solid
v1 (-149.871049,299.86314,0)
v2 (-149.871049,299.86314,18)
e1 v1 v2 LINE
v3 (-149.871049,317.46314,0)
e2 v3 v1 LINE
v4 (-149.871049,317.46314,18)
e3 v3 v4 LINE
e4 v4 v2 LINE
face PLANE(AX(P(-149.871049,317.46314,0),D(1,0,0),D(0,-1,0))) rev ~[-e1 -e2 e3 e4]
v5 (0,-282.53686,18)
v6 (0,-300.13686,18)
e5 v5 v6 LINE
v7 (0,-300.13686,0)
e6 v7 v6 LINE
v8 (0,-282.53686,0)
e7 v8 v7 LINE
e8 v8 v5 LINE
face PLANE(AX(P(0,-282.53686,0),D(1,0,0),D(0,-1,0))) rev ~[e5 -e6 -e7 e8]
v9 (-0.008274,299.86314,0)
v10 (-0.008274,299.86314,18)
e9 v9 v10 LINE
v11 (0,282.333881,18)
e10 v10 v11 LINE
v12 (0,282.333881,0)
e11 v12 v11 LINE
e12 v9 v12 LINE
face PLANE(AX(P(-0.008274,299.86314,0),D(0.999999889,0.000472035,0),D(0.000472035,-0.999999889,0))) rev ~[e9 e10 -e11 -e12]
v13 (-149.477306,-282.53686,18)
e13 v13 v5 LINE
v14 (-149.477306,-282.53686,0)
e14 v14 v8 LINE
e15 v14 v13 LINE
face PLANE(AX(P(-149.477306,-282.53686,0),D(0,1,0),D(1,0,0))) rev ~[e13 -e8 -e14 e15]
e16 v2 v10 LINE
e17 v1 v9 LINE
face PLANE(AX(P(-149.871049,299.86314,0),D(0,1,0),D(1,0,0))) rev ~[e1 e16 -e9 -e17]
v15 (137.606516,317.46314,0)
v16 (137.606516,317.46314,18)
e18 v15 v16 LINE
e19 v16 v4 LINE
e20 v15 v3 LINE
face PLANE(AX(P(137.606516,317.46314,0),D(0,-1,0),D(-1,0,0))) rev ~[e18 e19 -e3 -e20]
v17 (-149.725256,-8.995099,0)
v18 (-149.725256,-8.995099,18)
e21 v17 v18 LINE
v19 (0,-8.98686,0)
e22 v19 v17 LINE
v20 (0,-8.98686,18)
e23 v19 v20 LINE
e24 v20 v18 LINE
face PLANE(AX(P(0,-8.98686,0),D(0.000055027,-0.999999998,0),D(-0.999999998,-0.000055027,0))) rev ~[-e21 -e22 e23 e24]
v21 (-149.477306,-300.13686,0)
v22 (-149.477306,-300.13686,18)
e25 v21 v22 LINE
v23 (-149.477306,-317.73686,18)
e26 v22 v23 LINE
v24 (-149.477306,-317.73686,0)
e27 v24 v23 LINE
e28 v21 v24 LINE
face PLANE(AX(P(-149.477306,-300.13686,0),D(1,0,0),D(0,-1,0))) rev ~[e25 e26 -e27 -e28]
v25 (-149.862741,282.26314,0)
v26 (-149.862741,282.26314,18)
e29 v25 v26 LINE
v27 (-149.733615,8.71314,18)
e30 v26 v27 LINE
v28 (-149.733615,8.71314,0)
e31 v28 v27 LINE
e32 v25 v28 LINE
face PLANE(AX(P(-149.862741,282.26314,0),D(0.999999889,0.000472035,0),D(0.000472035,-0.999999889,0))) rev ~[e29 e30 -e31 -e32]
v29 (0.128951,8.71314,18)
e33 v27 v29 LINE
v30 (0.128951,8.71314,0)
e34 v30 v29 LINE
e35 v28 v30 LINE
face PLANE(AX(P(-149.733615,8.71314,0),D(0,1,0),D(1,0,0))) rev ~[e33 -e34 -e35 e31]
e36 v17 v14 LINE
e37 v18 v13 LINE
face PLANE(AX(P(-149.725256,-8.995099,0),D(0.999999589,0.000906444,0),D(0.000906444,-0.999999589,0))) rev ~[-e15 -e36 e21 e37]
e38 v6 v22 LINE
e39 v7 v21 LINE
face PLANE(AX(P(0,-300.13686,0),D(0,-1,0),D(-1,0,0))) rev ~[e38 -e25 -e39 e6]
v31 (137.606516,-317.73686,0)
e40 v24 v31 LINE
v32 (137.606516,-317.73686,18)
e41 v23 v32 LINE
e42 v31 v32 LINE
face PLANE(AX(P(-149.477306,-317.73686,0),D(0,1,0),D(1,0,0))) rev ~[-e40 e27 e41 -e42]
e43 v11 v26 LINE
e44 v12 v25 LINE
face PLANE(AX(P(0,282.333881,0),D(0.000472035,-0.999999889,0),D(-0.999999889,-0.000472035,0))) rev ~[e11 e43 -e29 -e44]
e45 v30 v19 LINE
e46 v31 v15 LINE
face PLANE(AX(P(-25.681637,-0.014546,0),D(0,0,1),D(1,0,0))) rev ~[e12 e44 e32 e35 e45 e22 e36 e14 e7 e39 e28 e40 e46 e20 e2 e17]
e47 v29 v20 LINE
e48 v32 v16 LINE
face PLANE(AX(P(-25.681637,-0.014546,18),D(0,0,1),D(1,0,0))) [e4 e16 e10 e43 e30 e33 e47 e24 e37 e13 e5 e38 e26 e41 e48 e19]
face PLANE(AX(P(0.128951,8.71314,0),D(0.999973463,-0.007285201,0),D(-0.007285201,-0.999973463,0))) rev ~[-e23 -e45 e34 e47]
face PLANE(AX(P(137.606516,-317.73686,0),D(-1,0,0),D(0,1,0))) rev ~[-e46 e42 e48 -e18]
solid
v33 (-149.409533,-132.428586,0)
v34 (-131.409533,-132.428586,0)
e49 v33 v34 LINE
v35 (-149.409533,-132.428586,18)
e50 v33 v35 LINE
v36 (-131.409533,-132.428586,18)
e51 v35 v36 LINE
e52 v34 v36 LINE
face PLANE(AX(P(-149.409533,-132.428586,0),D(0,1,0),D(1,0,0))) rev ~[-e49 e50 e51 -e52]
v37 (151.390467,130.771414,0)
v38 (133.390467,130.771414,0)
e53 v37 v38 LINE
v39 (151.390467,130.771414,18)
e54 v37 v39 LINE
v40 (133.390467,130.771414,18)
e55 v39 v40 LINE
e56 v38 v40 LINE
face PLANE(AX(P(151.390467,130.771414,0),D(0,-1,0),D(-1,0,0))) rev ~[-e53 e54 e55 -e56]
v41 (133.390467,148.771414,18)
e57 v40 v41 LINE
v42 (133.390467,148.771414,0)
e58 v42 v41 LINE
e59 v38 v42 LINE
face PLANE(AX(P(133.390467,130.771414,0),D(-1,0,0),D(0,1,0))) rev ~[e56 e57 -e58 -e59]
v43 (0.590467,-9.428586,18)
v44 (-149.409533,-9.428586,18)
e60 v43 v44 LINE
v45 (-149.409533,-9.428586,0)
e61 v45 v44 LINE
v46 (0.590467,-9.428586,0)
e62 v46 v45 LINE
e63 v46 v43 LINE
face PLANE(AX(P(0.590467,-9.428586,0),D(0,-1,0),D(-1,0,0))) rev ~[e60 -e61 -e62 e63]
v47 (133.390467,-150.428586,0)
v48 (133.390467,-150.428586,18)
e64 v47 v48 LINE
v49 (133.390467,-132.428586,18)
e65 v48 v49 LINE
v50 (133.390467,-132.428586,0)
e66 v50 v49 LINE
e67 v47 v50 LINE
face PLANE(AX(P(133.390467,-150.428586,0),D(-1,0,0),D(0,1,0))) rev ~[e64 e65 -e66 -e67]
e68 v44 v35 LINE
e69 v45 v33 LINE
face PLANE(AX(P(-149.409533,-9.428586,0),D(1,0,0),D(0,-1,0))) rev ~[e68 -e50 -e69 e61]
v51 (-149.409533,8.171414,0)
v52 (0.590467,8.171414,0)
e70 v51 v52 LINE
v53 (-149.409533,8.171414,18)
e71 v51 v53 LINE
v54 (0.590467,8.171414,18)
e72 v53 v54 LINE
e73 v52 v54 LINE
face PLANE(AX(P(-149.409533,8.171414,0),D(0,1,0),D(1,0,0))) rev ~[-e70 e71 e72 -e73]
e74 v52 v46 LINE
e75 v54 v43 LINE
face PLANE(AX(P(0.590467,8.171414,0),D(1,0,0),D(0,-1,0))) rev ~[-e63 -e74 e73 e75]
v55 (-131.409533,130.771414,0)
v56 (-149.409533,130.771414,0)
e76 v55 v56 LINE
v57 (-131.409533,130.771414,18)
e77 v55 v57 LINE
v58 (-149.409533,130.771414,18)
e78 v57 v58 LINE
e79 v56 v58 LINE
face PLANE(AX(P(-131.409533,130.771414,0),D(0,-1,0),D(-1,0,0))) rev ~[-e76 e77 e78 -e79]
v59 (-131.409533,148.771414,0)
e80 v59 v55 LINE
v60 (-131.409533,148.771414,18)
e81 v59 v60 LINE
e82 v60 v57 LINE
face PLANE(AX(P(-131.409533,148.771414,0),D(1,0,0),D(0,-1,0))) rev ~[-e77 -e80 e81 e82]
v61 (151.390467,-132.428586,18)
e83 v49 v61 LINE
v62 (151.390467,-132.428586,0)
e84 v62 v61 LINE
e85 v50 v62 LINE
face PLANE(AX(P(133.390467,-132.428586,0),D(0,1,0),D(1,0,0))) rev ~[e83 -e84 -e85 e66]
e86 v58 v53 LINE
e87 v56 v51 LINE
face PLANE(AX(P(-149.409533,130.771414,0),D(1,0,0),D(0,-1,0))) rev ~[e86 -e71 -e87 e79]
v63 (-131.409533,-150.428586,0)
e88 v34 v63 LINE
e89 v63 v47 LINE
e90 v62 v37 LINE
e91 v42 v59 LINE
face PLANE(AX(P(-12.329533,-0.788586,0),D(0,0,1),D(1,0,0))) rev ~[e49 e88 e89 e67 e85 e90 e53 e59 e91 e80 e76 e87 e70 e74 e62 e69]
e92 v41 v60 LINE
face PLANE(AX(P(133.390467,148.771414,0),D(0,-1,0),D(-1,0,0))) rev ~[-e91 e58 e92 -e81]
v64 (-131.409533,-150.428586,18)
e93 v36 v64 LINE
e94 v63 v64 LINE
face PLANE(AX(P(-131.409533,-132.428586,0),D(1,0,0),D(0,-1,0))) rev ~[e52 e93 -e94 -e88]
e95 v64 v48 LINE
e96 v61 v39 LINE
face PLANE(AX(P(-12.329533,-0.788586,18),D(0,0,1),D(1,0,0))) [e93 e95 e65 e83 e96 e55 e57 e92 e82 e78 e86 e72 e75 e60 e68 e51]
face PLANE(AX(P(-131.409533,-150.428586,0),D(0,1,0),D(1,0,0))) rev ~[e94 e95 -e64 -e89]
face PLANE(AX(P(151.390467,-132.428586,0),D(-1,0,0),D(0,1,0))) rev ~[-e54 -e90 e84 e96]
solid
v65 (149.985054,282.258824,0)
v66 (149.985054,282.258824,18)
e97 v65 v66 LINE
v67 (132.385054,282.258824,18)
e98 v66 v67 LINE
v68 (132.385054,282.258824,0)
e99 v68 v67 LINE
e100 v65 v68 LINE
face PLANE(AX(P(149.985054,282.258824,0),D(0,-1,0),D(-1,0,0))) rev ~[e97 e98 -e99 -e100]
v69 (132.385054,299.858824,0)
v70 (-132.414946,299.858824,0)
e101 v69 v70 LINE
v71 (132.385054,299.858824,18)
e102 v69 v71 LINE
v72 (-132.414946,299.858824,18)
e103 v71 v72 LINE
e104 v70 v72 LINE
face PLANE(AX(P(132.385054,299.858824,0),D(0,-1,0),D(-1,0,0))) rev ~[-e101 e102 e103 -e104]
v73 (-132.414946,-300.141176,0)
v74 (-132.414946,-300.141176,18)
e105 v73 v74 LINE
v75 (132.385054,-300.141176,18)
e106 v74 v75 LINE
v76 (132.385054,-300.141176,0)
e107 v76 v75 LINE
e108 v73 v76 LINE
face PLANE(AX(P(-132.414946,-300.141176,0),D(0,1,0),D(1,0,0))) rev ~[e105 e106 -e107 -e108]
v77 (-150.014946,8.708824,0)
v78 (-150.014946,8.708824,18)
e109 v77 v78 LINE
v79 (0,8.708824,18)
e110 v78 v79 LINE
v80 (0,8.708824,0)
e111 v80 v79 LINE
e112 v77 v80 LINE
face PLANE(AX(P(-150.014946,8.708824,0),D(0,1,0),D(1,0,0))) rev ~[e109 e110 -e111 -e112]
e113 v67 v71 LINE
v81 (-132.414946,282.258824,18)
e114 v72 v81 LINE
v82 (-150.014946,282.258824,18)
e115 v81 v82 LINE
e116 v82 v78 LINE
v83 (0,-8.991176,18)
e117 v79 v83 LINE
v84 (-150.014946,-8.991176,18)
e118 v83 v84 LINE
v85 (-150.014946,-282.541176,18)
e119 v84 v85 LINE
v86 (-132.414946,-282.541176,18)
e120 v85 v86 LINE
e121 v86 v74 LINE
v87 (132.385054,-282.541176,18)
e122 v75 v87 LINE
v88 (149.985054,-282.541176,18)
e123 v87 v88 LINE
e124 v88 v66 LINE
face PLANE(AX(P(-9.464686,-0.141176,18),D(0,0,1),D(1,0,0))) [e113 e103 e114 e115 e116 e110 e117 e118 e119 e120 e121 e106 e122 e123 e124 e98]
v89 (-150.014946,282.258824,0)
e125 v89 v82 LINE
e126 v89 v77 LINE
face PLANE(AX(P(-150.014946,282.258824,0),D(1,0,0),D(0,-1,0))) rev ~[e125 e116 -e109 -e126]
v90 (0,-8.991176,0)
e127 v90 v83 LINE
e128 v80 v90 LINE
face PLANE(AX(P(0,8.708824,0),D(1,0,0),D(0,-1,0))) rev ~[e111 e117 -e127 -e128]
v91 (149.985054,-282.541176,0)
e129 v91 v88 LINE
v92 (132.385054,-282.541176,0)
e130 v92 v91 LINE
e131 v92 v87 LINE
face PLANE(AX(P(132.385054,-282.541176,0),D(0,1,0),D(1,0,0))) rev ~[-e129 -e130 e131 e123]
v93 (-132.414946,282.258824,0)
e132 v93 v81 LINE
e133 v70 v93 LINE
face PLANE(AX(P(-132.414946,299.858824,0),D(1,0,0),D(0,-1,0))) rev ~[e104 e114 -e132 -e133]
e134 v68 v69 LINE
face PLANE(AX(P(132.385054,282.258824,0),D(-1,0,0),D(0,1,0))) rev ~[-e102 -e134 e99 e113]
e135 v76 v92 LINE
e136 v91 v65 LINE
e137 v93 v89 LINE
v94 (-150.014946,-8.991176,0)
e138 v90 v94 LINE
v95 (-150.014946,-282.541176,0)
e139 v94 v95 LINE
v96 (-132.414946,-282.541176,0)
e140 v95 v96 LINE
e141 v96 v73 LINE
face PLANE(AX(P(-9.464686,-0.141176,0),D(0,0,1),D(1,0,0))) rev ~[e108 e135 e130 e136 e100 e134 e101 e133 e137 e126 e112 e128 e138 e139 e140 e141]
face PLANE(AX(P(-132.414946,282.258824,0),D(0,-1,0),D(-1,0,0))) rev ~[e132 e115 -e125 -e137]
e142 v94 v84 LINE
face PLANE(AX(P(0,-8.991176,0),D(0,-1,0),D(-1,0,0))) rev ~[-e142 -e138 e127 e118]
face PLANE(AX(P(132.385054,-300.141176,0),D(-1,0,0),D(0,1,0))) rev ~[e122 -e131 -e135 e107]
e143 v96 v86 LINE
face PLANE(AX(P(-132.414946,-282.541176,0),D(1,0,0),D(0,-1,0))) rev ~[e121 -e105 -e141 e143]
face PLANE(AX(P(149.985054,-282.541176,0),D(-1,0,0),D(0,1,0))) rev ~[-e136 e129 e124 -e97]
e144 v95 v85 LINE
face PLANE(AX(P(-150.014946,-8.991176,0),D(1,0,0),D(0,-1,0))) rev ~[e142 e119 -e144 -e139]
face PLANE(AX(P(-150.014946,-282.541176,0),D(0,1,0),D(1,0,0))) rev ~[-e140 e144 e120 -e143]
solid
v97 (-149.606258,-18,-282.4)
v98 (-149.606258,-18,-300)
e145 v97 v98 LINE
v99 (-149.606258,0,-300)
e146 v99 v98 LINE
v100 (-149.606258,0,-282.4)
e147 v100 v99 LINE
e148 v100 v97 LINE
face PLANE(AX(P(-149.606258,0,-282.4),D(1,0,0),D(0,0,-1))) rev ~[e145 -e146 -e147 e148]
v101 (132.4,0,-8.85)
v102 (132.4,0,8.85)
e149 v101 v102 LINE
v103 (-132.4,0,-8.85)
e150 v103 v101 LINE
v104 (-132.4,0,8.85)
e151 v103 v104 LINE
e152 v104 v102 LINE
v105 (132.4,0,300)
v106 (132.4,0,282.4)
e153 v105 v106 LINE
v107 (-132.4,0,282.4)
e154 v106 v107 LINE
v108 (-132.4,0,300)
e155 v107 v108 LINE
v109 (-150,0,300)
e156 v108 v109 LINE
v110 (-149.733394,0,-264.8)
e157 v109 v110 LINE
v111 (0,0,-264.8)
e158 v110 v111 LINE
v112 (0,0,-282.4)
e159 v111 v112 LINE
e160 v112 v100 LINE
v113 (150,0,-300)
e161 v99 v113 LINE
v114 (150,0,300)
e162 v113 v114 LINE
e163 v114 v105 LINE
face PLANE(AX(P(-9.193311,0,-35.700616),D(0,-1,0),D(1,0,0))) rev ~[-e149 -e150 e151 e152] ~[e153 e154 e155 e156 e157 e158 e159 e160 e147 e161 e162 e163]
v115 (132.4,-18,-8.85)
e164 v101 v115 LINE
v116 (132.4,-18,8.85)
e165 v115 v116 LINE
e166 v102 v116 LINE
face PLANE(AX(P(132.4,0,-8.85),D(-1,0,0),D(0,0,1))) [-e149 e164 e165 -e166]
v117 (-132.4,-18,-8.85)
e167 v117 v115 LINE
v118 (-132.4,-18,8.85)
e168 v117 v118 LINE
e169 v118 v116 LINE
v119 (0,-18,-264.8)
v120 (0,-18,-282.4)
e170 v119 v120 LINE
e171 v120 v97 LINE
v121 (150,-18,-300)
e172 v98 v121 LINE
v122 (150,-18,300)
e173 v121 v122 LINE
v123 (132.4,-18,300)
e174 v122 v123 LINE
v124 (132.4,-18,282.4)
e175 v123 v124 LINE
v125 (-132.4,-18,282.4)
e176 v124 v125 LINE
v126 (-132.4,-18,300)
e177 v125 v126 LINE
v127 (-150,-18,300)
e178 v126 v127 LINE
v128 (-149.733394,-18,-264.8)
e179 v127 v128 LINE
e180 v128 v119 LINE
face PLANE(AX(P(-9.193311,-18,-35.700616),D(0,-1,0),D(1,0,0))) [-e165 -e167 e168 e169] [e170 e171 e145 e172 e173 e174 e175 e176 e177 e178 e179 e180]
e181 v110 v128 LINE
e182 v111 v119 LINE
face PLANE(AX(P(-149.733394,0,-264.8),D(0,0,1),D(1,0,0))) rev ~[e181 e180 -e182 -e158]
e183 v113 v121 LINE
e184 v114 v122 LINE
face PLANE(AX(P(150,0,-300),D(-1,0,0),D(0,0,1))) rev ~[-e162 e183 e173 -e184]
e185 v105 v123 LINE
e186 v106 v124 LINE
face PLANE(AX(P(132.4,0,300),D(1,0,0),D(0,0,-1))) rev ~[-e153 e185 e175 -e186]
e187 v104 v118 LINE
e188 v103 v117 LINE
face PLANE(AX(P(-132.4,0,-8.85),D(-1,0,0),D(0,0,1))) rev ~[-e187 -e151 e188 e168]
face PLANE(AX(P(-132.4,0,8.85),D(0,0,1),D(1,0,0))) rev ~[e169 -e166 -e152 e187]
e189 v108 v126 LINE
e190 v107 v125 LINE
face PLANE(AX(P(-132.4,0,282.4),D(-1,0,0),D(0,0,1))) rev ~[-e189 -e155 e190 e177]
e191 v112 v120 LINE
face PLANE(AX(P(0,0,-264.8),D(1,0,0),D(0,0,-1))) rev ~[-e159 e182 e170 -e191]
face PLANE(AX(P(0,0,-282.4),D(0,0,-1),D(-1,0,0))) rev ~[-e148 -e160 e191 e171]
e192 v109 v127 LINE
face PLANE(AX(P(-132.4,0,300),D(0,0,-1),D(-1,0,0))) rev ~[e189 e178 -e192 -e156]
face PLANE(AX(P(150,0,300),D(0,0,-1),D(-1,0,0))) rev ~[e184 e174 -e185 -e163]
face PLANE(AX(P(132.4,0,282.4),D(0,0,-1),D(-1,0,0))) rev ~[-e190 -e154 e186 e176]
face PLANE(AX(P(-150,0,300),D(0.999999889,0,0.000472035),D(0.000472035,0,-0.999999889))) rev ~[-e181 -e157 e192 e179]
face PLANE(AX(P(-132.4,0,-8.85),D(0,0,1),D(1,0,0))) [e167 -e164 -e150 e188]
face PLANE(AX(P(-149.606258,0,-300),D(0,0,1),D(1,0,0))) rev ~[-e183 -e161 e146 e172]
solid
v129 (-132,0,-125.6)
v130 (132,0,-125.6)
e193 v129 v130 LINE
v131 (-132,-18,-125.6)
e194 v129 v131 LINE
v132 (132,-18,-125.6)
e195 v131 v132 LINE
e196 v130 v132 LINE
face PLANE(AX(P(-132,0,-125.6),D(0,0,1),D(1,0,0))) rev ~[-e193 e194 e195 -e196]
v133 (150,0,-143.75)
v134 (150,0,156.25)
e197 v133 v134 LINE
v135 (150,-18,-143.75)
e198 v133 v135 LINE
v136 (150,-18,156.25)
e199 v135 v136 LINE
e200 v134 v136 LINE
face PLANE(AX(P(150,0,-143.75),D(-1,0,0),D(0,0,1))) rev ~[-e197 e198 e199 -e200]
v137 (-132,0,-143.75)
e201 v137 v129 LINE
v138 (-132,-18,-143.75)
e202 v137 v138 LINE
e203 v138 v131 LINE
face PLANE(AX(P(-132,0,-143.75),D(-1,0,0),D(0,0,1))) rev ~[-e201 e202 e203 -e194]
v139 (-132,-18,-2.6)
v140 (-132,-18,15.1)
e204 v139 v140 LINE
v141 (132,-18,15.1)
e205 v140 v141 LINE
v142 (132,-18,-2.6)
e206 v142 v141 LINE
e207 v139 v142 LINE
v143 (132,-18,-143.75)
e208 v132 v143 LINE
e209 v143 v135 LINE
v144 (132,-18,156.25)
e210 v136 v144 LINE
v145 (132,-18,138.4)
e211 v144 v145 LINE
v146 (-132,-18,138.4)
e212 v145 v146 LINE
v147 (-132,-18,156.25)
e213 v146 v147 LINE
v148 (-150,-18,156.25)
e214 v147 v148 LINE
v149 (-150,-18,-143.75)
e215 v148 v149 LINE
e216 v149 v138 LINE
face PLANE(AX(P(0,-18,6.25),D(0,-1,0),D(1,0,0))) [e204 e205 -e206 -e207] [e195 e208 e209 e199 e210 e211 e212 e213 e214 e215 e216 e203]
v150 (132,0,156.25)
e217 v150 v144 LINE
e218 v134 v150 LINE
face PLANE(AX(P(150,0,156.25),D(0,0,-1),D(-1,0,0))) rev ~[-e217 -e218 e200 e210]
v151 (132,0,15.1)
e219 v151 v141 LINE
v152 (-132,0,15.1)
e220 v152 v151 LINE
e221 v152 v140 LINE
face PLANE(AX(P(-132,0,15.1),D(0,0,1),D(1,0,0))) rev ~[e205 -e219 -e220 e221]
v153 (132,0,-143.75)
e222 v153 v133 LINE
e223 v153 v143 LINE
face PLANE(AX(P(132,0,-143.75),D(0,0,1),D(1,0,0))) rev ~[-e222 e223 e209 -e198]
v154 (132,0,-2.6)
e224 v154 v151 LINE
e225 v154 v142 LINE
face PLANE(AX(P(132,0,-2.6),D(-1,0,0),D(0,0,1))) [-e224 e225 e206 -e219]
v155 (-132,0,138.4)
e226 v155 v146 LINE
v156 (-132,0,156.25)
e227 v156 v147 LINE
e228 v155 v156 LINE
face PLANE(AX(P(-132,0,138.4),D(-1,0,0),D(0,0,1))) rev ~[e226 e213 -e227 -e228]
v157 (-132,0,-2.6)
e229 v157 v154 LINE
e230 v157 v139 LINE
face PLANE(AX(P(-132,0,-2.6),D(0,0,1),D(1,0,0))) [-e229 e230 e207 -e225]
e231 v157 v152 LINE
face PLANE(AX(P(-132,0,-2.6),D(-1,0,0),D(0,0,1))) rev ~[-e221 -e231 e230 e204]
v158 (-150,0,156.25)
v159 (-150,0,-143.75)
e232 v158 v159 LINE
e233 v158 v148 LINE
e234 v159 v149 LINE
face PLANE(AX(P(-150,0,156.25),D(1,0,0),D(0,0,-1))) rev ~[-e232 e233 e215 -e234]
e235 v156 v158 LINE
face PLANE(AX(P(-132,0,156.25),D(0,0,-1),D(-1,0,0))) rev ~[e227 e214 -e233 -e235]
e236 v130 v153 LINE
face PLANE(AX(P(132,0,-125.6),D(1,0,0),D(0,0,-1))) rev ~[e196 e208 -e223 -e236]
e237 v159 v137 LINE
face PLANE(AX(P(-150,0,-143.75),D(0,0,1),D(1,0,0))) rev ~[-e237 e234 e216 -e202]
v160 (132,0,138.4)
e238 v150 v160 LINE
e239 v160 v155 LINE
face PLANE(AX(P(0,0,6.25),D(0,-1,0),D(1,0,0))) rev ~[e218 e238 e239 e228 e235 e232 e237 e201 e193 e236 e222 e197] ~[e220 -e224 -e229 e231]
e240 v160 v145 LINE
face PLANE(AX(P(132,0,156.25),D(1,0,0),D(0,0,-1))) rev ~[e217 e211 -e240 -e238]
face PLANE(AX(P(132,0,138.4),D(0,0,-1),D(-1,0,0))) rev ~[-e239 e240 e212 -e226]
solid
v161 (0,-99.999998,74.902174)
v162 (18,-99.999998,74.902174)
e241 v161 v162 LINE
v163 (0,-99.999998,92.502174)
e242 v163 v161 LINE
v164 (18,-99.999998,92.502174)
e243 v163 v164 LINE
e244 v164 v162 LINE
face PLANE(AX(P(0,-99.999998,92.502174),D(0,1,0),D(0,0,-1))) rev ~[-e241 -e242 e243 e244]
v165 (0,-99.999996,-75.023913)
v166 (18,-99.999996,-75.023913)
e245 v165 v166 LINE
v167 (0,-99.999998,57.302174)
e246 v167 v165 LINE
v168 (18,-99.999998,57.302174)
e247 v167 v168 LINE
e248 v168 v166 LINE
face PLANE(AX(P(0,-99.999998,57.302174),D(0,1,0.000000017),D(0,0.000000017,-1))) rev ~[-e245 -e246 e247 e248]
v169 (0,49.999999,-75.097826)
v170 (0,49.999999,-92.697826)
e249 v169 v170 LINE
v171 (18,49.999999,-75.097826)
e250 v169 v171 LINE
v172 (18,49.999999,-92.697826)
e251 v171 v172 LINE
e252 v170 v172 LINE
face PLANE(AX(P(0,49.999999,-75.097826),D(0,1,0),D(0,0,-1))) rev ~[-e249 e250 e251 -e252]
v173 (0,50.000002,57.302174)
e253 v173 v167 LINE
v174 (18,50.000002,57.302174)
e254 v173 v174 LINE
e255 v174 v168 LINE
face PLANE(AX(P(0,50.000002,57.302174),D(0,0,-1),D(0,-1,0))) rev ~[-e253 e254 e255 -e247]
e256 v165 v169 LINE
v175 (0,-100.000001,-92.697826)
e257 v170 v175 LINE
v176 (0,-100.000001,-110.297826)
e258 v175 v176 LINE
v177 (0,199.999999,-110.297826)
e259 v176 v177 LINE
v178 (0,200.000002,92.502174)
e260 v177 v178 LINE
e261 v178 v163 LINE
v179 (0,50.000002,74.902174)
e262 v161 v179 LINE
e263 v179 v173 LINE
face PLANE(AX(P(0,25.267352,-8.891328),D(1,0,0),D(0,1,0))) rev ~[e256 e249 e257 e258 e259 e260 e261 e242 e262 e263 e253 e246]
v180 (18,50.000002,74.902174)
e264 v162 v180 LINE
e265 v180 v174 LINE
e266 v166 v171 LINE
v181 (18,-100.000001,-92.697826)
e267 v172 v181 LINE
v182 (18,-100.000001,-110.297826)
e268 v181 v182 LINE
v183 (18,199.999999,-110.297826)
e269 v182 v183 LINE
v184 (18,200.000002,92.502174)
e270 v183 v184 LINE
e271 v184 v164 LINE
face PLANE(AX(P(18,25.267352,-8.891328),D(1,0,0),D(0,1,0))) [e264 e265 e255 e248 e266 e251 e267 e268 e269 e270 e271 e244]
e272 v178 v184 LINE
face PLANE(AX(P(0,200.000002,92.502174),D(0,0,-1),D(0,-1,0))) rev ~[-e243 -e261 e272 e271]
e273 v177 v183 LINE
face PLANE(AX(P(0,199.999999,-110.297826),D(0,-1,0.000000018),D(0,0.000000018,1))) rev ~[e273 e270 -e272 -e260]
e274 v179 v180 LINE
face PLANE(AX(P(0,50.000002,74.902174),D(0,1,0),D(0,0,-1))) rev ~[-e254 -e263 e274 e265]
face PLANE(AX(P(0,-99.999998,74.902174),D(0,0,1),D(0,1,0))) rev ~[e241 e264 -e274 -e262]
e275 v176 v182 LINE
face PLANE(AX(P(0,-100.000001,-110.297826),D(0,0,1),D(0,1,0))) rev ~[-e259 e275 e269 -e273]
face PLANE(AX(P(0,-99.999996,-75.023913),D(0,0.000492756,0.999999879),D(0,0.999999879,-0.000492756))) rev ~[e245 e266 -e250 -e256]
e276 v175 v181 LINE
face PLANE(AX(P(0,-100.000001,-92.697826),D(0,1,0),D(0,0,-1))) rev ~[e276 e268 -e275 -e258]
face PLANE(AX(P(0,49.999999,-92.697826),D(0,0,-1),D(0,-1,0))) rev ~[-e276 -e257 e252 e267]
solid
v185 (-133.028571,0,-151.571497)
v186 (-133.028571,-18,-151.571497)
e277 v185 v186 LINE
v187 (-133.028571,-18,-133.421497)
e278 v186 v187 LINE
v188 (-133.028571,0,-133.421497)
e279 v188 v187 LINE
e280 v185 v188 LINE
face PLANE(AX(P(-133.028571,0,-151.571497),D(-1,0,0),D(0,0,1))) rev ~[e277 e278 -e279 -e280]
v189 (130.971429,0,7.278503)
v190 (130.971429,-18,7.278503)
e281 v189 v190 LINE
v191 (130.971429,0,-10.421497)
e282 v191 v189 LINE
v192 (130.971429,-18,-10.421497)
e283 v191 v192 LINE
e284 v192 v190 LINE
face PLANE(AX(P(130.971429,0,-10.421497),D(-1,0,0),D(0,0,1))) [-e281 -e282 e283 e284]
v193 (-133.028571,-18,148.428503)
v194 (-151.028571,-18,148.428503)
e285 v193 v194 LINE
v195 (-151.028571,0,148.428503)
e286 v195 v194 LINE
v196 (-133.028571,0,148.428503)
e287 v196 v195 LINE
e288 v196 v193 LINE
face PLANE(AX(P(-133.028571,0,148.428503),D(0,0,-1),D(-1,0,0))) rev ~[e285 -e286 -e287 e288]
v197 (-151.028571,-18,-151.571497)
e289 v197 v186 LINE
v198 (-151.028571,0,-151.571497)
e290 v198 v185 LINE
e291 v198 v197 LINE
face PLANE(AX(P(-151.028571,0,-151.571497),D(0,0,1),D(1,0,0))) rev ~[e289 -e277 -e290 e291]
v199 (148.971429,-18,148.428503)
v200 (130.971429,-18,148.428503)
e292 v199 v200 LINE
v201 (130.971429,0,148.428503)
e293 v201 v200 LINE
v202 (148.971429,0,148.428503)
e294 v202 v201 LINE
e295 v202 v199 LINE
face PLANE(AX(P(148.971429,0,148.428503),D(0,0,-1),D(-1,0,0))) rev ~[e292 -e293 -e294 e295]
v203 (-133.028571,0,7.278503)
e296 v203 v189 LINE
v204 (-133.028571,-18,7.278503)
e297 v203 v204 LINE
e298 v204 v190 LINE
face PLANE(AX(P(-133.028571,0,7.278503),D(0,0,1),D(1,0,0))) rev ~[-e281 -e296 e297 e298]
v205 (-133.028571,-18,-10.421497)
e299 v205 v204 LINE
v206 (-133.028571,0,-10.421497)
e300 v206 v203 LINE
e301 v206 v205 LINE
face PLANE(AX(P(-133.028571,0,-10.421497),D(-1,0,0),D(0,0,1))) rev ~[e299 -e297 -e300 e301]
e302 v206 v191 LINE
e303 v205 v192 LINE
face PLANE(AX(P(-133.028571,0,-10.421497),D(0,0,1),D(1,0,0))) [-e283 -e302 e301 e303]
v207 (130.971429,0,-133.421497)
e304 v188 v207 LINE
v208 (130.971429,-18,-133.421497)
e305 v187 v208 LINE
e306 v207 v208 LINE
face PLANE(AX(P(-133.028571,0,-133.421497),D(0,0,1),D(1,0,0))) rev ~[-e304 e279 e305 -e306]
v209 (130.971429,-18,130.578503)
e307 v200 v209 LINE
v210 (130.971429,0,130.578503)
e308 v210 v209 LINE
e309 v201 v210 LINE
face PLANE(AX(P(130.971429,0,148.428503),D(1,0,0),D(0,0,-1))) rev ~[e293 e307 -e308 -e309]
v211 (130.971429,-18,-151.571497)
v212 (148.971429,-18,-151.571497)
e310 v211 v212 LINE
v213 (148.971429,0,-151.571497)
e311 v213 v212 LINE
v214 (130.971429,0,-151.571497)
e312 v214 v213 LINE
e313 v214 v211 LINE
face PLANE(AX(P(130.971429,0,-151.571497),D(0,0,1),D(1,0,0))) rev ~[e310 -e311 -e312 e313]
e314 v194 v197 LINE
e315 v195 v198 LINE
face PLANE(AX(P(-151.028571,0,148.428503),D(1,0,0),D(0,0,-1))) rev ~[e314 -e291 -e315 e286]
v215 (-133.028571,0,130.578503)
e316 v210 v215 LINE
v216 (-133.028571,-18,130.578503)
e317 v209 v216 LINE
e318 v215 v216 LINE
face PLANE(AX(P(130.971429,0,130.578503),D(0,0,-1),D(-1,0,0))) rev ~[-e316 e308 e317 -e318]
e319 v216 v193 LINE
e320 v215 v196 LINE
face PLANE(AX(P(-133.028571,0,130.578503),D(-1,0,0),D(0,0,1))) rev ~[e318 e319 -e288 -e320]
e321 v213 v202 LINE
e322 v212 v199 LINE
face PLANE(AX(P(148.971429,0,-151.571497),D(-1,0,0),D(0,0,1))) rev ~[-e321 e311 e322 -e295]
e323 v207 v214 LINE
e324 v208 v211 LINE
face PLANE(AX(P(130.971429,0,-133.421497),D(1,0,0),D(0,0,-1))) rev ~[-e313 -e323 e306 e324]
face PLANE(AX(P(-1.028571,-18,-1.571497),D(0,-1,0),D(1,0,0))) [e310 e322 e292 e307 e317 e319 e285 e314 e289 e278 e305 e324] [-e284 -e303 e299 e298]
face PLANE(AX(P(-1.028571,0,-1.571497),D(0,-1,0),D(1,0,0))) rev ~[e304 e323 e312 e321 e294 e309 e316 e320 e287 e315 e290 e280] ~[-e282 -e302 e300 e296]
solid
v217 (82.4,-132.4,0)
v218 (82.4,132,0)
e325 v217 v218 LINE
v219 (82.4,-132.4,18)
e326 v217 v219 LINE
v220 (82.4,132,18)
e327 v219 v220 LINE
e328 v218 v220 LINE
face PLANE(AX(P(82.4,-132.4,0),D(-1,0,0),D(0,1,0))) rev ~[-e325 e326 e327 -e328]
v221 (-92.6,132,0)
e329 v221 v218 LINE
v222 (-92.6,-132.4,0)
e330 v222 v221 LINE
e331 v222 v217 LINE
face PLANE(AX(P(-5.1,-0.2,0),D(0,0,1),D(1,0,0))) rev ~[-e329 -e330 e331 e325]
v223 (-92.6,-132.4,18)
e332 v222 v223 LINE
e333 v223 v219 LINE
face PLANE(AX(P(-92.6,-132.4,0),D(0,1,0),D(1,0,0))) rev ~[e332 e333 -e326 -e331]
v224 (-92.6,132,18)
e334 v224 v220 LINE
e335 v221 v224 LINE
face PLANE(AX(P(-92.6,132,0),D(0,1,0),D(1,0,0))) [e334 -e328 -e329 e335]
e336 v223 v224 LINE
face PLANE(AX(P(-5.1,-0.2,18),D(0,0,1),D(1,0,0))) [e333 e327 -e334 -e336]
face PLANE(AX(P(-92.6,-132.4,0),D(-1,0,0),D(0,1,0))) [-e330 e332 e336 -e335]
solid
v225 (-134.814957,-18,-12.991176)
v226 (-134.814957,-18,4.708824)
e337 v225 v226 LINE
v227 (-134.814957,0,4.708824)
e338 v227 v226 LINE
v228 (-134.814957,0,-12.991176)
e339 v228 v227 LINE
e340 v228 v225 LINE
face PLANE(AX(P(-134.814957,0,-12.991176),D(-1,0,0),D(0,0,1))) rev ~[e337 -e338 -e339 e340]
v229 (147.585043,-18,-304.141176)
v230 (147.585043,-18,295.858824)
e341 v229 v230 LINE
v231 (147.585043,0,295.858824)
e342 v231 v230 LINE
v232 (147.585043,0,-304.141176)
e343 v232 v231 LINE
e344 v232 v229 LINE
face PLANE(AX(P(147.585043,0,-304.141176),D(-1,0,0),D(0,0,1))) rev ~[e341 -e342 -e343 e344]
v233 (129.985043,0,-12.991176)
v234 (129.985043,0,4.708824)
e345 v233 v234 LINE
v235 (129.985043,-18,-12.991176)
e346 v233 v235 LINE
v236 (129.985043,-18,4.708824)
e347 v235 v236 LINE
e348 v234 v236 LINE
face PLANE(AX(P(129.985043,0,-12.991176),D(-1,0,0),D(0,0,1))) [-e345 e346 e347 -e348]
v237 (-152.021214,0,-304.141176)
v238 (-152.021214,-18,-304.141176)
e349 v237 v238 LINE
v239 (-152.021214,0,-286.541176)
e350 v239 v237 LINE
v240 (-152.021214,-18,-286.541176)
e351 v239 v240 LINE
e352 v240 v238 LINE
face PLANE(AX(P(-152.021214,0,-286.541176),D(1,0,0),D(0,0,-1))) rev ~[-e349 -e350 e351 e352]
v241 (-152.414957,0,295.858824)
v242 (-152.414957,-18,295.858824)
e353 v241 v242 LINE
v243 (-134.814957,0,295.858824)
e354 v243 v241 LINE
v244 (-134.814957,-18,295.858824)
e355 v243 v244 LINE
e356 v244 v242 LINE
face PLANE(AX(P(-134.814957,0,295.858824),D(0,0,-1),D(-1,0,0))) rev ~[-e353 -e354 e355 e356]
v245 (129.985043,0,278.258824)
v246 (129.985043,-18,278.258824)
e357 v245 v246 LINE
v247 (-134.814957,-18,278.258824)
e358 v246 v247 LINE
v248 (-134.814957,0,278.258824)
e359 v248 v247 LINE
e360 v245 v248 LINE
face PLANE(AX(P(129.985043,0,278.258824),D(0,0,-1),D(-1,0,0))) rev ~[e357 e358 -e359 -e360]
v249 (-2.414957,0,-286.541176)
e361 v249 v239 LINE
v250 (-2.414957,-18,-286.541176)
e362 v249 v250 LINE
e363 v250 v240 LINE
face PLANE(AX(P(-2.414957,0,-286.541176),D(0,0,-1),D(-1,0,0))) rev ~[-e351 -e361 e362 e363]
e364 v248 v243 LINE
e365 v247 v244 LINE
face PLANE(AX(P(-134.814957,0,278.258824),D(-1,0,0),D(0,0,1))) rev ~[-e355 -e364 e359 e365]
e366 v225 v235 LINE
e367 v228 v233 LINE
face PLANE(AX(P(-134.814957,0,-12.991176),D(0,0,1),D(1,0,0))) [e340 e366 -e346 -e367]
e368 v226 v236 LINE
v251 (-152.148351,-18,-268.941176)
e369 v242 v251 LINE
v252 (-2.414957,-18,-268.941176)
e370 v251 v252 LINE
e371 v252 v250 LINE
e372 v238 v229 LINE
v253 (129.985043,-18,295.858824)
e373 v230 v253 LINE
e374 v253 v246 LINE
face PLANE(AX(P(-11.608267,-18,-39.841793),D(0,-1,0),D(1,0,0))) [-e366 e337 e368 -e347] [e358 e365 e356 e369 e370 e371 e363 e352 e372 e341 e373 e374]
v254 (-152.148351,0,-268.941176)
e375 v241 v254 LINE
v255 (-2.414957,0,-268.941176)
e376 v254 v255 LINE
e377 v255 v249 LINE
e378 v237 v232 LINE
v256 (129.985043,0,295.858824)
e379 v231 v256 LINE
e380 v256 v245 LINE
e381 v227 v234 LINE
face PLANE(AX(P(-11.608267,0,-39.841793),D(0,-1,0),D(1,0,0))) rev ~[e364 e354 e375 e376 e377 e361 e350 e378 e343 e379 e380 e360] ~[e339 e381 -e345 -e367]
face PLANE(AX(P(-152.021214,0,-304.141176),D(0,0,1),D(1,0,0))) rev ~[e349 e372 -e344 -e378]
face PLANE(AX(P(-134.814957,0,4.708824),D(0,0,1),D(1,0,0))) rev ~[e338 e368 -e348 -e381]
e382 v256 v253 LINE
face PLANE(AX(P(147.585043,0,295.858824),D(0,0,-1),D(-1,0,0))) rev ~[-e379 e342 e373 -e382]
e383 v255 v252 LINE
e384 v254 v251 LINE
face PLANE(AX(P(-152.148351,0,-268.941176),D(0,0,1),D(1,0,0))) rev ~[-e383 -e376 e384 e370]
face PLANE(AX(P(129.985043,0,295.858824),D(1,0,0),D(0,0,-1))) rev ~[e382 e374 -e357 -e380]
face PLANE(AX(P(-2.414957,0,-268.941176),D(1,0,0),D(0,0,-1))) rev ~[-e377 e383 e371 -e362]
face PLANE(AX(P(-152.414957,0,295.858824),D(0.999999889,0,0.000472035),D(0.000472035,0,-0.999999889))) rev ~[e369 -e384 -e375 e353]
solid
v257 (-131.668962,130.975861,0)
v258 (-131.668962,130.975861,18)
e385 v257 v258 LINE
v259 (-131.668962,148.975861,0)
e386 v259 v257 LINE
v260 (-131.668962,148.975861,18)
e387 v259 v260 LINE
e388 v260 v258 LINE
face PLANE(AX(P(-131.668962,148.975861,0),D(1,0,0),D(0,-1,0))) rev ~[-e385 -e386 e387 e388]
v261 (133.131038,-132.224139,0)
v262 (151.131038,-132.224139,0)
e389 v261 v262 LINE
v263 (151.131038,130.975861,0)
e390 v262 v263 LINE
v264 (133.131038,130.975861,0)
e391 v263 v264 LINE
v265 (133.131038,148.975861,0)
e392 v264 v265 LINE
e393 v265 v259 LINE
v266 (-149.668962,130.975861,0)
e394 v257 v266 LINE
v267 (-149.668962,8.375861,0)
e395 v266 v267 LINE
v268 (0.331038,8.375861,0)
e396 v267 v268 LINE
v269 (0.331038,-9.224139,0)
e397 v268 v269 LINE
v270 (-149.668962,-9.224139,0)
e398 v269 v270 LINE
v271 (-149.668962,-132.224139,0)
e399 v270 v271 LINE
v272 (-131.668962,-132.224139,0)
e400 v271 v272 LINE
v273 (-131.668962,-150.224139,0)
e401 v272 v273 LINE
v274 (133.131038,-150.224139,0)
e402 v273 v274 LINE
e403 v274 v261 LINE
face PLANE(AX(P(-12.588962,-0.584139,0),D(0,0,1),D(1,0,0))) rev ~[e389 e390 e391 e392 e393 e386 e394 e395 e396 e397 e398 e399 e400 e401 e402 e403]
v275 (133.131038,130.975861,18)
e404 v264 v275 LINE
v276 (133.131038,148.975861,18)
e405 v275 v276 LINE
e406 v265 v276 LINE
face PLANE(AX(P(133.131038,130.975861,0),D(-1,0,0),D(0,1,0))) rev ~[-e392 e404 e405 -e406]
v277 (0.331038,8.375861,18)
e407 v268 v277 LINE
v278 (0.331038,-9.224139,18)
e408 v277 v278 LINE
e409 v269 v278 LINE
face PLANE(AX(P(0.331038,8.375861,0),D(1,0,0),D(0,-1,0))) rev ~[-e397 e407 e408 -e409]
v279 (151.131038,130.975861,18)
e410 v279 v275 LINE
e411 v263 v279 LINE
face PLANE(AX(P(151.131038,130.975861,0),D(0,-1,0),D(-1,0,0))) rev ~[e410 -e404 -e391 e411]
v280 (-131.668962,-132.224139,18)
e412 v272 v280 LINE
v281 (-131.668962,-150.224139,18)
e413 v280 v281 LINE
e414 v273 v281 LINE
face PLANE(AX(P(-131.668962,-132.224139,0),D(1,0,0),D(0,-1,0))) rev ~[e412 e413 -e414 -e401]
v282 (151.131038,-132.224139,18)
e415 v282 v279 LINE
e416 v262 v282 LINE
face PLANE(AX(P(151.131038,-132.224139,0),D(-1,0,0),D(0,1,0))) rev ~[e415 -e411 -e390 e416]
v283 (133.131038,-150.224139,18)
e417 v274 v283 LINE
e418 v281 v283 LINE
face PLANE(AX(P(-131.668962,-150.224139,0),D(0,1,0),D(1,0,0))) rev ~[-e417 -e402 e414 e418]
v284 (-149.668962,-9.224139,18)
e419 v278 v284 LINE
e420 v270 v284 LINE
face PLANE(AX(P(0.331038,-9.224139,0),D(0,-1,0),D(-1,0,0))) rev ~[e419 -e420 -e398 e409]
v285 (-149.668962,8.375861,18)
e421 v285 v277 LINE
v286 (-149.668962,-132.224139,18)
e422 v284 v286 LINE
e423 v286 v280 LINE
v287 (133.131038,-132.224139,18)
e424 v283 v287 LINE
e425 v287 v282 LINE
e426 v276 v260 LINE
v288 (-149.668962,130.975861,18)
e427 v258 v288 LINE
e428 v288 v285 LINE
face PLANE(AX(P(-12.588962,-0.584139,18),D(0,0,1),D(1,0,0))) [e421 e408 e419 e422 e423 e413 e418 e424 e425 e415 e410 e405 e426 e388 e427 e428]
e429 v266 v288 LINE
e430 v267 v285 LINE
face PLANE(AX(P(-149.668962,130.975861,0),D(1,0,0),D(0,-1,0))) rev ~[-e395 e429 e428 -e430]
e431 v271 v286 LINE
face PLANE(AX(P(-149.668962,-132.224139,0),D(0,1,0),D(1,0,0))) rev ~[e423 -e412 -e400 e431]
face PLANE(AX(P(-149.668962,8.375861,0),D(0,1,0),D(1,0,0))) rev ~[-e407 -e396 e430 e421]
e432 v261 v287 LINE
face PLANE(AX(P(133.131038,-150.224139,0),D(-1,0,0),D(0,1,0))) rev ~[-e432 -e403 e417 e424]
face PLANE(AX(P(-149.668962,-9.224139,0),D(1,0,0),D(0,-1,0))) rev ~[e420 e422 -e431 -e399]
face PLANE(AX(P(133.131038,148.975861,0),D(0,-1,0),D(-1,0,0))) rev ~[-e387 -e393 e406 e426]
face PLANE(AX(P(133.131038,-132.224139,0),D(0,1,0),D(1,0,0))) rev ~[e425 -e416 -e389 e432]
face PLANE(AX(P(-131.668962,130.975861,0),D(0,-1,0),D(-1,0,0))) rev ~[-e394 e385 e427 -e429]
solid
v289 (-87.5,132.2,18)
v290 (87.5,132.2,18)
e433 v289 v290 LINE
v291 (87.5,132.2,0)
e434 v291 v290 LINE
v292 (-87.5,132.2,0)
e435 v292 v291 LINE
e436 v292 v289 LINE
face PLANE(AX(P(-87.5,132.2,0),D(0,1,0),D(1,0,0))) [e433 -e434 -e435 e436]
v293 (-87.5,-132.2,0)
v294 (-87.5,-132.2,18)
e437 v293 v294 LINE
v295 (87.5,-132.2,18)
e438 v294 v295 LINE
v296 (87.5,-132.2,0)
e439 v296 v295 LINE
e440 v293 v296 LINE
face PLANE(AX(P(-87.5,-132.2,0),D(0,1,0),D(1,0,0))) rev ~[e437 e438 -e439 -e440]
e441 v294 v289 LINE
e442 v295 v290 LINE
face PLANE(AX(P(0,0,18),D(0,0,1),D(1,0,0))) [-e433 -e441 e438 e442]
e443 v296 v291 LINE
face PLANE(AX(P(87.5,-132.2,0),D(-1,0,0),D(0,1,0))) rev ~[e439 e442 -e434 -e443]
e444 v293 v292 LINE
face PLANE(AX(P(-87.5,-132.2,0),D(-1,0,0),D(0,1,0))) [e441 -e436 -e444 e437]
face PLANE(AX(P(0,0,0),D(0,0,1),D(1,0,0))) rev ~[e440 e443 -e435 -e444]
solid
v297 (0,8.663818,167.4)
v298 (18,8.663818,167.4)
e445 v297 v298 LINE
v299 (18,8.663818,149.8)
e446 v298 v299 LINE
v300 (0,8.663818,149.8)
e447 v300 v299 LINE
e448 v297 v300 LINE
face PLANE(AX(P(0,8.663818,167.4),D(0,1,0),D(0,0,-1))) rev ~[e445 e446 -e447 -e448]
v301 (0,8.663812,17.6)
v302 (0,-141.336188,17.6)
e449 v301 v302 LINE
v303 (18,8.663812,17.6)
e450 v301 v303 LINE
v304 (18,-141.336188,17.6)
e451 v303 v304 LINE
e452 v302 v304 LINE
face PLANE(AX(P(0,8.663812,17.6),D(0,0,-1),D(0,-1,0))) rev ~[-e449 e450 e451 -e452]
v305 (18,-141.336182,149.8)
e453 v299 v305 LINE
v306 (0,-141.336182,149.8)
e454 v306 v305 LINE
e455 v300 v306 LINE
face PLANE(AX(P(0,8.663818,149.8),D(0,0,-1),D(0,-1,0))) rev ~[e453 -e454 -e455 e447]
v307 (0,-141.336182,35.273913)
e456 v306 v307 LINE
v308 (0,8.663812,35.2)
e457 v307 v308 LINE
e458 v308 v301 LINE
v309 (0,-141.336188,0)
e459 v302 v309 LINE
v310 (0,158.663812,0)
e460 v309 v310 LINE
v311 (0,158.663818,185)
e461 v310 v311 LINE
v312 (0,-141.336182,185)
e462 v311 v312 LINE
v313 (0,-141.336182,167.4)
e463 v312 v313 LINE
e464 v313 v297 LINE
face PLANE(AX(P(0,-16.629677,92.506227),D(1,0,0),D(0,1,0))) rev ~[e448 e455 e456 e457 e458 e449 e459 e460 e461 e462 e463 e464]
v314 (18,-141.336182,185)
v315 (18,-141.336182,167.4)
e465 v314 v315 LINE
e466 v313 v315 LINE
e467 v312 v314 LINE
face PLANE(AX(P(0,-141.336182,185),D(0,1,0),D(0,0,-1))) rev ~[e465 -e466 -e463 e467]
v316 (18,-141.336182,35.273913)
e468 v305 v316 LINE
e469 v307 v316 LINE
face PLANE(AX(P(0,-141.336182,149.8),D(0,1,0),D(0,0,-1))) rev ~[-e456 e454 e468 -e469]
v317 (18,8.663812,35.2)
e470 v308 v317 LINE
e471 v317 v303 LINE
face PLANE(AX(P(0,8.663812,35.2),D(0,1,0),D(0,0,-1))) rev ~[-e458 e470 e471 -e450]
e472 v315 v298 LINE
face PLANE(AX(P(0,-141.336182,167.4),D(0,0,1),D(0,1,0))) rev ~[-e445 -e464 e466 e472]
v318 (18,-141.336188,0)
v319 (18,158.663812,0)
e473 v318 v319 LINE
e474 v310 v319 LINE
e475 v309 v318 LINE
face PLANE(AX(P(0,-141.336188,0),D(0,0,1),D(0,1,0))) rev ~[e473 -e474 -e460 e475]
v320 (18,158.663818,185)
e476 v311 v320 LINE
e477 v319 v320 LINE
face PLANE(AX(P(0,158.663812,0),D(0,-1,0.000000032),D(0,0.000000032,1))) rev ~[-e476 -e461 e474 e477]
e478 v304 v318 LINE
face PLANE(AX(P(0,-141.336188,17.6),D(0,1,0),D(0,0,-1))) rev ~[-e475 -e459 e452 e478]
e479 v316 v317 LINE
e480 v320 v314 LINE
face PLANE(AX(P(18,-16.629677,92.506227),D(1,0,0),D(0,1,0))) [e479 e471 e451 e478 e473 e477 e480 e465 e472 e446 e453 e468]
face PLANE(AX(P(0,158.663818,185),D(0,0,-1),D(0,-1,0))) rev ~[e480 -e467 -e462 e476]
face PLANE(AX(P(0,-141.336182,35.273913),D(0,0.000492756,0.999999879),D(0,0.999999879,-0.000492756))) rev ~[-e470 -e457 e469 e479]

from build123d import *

# Parameters (mm, degrees)
F0_W      = 264.8
F0_H      = 17.7
F12_DEPTH = 18
F1_W      = 264.8
F1_H      = 17.7
F13_DEPTH = 18
F14_DEPTH = 18
F15_DEPTH = 18
F16_DEPTH = 18
F17_DEPTH = 18
F6_W      = 264
F6_H      = 17.7
F18_DEPTH = 18
F7_W      = 264
F7_H      = 17.7
F19_DEPTH = 18
F8_W      = 175
F8_H      = 264.4
F20_DEPTH = 18
F9_W      = 175
F9_H      = 264.4
F21_DEPTH = 18
F22_DEPTH = 18
F23_DEPTH = 18


# Not quite as in the source:
# - ends of sketch curves that miss each other by under 0.0002 mm in the source are joined


with BuildPart() as f12:
    # F0 (on Front) → F12 (new body)
    with BuildSketch(Plane.XZ):
        Polygon((-149.6062576771, -300), (150, -300), (150, 300), (132.4, 300), (132.4, 282.4), (-132.4, 282.4), (-132.4, 300), (-150, 300), (-149.7333943844, -264.8), (0, -264.8), (0, -282.4), (-149.6062576771, -282.4), align=None)
        Rectangle(F0_W, F0_H, mode=Mode.SUBTRACT)
    extrude(amount=F12_DEPTH)


with BuildPart() as f13:
    # F1 (on Front) → F13 (new body)
    with BuildSketch(Plane.XZ):
        Polygon((-152.021214366, -304.1411764706), (147.5850433111, -304.1411764706), (147.5850433111, 295.8588235294), (129.9850433111, 295.8588235294), (129.9850433111, 278.2588235294), (-134.8149566889, 278.2588235294), (-134.8149566889, 295.8588235294), (-152.4149566889, 295.8588235294), (-152.1483510733, -268.9411764706), (-2.4149566889, -268.9411764706), (-2.4149566889, -286.5411764706), (-152.021214366, -286.5411764706), align=None)
        with Locations((-2.4149566889, -4.1411764706)):
            Rectangle(F1_W, F1_H, mode=Mode.SUBTRACT)
    extrude(amount=F13_DEPTH)


with BuildPart() as f14:
    # F2 (on Top) → F14 (new body)
    with BuildSketch(Plane.XY):
        Polygon((132.385053514, -282.5411762625), (149.985053514, -282.5411762625), (149.985053514, 282.2588237375), (132.385053514, 282.2588237375), (132.385053514, 299.8588237375), (-132.414946486, 299.8588237375), (-132.414946486, 282.2588237375), (-150.014946486, 282.2588237375), (-150.014946486, 8.7088237375), (-132.414946486, 8.7088237375), (0, 8.7088237375), (0, -8.9911762625), (-132.414946486, -8.9911762625), (-150.014946486, -8.9911762625), (-150.014946486, -282.5411762625), (-132.414946486, -282.5411762625), (-132.414946486, -300.1411762625), (132.385053514, -300.1411762625), align=None)
    extrude(amount=F14_DEPTH)


with BuildPart() as f15:
    # F3 (on Top) → F15 (new body)
    with BuildSketch(Plane.XY):
        Polygon((-149.8627406966, 282.263140464), (-149.7336154024, 8.713140464), (0.1289514797, 8.713140464), (0, -8.986859536), (-149.7252564861, -8.9950985407), (-149.4773061974, -282.536859536), (0, -282.536859536), (0, -300.136859536), (-149.4773061974, -300.136859536), (-149.4773061974, -317.736859536), (137.6065164804, -317.736859536), (137.6065164804, 299.863140464), (137.6065164804, 317.463140464), (-149.8710485203, 317.463140464), (-149.8710485203, 299.863140464), (-0.0082744317, 299.863140464), (0, 282.3338809885), align=None)
    extrude(amount=F15_DEPTH)


with BuildPart() as f16:
    # F4 (on Top) → F16 (new body)
    with BuildSketch(Plane.XY):
        Polygon((-131.6689617634, -150.224139154), (133.1310382366, -150.224139154), (133.1310382366, -132.224139154), (151.1310382366, -132.224139154), (151.1310382366, 130.975860846), (133.1310382366, 130.975860846), (133.1310382366, 148.975860846), (-131.6689617634, 148.975860846), (-131.6689617634, 130.975860846), (-149.6689617634, 130.975860846), (-149.6689617634, 8.375860846), (0.3310382366, 8.375860846), (0.3310382366, -9.224139154), (-149.6689617634, -9.224139154), (-149.6689617634, -132.224139154), (-131.6689617634, -132.224139154), align=None)
    extrude(amount=F16_DEPTH)


with BuildPart() as f17:
    # F5 (on Top) → F17 (new body)
    with BuildSketch(Plane.XY):
        Polygon((-131.409532547, -150.428586483), (133.390467453, -150.428586483), (133.390467453, -132.428586483), (151.390467453, -132.428586483), (151.390467453, 130.771413517), (133.390467453, 130.771413517), (133.390467453, 148.771413517), (-131.409532547, 148.771413517), (-131.409532547, 130.771413517), (-149.409532547, 130.771413517), (-149.409532547, 8.171413517), (0.590467453, 8.171413517), (0.590467453, -9.428586483), (-149.409532547, -9.428586483), (-149.409532547, -132.428586483), (-131.409532547, -132.428586483), align=None)
    extrude(amount=F17_DEPTH)


with BuildPart() as f18:
    # F6 (on Front) → F18 (new body)
    with BuildSketch(Plane.XZ):
        Polygon((130.9714285714, -151.5714973211), (148.9714285714, -151.5714973211), (148.9714285714, 148.4285026789), (130.9714285714, 148.4285026789), (130.9714285714, 130.5785026789), (-133.0285714286, 130.5785026789), (-133.0285714286, 148.4285026789), (-151.0285714286, 148.4285026789), (-151.0285714286, -151.5714973211), (-133.0285714286, -151.5714973211), (-133.0285714286, -133.4214973211), (-1.0285714286, -133.4214973211), (130.9714285714, -133.4214973211), align=None)
        with Locations((-1.0285714286, -1.5714973211)):
            Rectangle(F6_W, F6_H, mode=Mode.SUBTRACT)
    extrude(amount=F18_DEPTH)


with BuildPart() as f19:
    # F7 (on Front) → F19 (new body)
    with BuildSketch(Plane.XZ):
        Polygon((132, -143.75), (150, -143.75), (150, 156.25), (132, 156.25), (132, 138.4), (-132, 138.4), (-132, 156.25), (-150, 156.25), (-150, -143.75), (-132, -143.75), (-132, -125.6), (0, -125.6), (132, -125.6), align=None)
        with Locations((0, 6.25)):
            Rectangle(F7_W, F7_H, mode=Mode.SUBTRACT)
    extrude(amount=F19_DEPTH)


with BuildPart() as f20:
    # F8 (on Top) → F20 (new body)
    with BuildSketch(Plane.XY):
        Rectangle(F8_W, F8_H)
    extrude(amount=F20_DEPTH)


with BuildPart() as f21:
    # F9 (on Top) → F21 (new body)
    with BuildSketch(Plane.XY):
        with Locations((-5.1, -0.2)):
            Rectangle(F9_W, F9_H)
    extrude(amount=F21_DEPTH)


with BuildPart() as f22:
    # F10 (on Right) → F22 (new body)
    with BuildSketch(Plane.YZ):
        Polygon((8.6638122797, 17.6), (-141.3361877203, 17.6), (-141.3361877203, 0), (158.6638122797, 0), (158.6638182402, 185), (-141.3361817598, 185), (-141.3361817598, 167.4), (8.6638182402, 167.4), (8.6638182402, 149.8), (-141.3361817598, 149.8), (-141.3361817598, 35.2739133894), (8.6638122797, 35.2), align=None)
    extrude(amount=F22_DEPTH)


with BuildPart() as f23:
    # F11 (on Right) → F23 (new body)
    with BuildSketch(Plane.YZ):
        Polygon((49.9999985099, -92.6978261158), (-100.0000014901, -92.6978261158), (-100.0000014901, -110.2978261158), (199.9999985099, -110.2978261158), (200.0000022352, 92.5021738842), (-99.9999977648, 92.5021738842), (-99.9999977648, 74.9021738842), (50.0000022352, 74.9021738842), (50.0000022352, 57.3021738842), (-99.9999977648, 57.3021738842), (-99.9999955297, -75.0239127263), (49.9999985099, -75.0978261158), align=None)
    extrude(amount=F23_DEPTH)


solid = Compound([f12.part, f13.part, f14.part, f15.part, f16.part, f17.part, f18.part, f19.part, f20.part, f21.part, f22.part, f23.part])
